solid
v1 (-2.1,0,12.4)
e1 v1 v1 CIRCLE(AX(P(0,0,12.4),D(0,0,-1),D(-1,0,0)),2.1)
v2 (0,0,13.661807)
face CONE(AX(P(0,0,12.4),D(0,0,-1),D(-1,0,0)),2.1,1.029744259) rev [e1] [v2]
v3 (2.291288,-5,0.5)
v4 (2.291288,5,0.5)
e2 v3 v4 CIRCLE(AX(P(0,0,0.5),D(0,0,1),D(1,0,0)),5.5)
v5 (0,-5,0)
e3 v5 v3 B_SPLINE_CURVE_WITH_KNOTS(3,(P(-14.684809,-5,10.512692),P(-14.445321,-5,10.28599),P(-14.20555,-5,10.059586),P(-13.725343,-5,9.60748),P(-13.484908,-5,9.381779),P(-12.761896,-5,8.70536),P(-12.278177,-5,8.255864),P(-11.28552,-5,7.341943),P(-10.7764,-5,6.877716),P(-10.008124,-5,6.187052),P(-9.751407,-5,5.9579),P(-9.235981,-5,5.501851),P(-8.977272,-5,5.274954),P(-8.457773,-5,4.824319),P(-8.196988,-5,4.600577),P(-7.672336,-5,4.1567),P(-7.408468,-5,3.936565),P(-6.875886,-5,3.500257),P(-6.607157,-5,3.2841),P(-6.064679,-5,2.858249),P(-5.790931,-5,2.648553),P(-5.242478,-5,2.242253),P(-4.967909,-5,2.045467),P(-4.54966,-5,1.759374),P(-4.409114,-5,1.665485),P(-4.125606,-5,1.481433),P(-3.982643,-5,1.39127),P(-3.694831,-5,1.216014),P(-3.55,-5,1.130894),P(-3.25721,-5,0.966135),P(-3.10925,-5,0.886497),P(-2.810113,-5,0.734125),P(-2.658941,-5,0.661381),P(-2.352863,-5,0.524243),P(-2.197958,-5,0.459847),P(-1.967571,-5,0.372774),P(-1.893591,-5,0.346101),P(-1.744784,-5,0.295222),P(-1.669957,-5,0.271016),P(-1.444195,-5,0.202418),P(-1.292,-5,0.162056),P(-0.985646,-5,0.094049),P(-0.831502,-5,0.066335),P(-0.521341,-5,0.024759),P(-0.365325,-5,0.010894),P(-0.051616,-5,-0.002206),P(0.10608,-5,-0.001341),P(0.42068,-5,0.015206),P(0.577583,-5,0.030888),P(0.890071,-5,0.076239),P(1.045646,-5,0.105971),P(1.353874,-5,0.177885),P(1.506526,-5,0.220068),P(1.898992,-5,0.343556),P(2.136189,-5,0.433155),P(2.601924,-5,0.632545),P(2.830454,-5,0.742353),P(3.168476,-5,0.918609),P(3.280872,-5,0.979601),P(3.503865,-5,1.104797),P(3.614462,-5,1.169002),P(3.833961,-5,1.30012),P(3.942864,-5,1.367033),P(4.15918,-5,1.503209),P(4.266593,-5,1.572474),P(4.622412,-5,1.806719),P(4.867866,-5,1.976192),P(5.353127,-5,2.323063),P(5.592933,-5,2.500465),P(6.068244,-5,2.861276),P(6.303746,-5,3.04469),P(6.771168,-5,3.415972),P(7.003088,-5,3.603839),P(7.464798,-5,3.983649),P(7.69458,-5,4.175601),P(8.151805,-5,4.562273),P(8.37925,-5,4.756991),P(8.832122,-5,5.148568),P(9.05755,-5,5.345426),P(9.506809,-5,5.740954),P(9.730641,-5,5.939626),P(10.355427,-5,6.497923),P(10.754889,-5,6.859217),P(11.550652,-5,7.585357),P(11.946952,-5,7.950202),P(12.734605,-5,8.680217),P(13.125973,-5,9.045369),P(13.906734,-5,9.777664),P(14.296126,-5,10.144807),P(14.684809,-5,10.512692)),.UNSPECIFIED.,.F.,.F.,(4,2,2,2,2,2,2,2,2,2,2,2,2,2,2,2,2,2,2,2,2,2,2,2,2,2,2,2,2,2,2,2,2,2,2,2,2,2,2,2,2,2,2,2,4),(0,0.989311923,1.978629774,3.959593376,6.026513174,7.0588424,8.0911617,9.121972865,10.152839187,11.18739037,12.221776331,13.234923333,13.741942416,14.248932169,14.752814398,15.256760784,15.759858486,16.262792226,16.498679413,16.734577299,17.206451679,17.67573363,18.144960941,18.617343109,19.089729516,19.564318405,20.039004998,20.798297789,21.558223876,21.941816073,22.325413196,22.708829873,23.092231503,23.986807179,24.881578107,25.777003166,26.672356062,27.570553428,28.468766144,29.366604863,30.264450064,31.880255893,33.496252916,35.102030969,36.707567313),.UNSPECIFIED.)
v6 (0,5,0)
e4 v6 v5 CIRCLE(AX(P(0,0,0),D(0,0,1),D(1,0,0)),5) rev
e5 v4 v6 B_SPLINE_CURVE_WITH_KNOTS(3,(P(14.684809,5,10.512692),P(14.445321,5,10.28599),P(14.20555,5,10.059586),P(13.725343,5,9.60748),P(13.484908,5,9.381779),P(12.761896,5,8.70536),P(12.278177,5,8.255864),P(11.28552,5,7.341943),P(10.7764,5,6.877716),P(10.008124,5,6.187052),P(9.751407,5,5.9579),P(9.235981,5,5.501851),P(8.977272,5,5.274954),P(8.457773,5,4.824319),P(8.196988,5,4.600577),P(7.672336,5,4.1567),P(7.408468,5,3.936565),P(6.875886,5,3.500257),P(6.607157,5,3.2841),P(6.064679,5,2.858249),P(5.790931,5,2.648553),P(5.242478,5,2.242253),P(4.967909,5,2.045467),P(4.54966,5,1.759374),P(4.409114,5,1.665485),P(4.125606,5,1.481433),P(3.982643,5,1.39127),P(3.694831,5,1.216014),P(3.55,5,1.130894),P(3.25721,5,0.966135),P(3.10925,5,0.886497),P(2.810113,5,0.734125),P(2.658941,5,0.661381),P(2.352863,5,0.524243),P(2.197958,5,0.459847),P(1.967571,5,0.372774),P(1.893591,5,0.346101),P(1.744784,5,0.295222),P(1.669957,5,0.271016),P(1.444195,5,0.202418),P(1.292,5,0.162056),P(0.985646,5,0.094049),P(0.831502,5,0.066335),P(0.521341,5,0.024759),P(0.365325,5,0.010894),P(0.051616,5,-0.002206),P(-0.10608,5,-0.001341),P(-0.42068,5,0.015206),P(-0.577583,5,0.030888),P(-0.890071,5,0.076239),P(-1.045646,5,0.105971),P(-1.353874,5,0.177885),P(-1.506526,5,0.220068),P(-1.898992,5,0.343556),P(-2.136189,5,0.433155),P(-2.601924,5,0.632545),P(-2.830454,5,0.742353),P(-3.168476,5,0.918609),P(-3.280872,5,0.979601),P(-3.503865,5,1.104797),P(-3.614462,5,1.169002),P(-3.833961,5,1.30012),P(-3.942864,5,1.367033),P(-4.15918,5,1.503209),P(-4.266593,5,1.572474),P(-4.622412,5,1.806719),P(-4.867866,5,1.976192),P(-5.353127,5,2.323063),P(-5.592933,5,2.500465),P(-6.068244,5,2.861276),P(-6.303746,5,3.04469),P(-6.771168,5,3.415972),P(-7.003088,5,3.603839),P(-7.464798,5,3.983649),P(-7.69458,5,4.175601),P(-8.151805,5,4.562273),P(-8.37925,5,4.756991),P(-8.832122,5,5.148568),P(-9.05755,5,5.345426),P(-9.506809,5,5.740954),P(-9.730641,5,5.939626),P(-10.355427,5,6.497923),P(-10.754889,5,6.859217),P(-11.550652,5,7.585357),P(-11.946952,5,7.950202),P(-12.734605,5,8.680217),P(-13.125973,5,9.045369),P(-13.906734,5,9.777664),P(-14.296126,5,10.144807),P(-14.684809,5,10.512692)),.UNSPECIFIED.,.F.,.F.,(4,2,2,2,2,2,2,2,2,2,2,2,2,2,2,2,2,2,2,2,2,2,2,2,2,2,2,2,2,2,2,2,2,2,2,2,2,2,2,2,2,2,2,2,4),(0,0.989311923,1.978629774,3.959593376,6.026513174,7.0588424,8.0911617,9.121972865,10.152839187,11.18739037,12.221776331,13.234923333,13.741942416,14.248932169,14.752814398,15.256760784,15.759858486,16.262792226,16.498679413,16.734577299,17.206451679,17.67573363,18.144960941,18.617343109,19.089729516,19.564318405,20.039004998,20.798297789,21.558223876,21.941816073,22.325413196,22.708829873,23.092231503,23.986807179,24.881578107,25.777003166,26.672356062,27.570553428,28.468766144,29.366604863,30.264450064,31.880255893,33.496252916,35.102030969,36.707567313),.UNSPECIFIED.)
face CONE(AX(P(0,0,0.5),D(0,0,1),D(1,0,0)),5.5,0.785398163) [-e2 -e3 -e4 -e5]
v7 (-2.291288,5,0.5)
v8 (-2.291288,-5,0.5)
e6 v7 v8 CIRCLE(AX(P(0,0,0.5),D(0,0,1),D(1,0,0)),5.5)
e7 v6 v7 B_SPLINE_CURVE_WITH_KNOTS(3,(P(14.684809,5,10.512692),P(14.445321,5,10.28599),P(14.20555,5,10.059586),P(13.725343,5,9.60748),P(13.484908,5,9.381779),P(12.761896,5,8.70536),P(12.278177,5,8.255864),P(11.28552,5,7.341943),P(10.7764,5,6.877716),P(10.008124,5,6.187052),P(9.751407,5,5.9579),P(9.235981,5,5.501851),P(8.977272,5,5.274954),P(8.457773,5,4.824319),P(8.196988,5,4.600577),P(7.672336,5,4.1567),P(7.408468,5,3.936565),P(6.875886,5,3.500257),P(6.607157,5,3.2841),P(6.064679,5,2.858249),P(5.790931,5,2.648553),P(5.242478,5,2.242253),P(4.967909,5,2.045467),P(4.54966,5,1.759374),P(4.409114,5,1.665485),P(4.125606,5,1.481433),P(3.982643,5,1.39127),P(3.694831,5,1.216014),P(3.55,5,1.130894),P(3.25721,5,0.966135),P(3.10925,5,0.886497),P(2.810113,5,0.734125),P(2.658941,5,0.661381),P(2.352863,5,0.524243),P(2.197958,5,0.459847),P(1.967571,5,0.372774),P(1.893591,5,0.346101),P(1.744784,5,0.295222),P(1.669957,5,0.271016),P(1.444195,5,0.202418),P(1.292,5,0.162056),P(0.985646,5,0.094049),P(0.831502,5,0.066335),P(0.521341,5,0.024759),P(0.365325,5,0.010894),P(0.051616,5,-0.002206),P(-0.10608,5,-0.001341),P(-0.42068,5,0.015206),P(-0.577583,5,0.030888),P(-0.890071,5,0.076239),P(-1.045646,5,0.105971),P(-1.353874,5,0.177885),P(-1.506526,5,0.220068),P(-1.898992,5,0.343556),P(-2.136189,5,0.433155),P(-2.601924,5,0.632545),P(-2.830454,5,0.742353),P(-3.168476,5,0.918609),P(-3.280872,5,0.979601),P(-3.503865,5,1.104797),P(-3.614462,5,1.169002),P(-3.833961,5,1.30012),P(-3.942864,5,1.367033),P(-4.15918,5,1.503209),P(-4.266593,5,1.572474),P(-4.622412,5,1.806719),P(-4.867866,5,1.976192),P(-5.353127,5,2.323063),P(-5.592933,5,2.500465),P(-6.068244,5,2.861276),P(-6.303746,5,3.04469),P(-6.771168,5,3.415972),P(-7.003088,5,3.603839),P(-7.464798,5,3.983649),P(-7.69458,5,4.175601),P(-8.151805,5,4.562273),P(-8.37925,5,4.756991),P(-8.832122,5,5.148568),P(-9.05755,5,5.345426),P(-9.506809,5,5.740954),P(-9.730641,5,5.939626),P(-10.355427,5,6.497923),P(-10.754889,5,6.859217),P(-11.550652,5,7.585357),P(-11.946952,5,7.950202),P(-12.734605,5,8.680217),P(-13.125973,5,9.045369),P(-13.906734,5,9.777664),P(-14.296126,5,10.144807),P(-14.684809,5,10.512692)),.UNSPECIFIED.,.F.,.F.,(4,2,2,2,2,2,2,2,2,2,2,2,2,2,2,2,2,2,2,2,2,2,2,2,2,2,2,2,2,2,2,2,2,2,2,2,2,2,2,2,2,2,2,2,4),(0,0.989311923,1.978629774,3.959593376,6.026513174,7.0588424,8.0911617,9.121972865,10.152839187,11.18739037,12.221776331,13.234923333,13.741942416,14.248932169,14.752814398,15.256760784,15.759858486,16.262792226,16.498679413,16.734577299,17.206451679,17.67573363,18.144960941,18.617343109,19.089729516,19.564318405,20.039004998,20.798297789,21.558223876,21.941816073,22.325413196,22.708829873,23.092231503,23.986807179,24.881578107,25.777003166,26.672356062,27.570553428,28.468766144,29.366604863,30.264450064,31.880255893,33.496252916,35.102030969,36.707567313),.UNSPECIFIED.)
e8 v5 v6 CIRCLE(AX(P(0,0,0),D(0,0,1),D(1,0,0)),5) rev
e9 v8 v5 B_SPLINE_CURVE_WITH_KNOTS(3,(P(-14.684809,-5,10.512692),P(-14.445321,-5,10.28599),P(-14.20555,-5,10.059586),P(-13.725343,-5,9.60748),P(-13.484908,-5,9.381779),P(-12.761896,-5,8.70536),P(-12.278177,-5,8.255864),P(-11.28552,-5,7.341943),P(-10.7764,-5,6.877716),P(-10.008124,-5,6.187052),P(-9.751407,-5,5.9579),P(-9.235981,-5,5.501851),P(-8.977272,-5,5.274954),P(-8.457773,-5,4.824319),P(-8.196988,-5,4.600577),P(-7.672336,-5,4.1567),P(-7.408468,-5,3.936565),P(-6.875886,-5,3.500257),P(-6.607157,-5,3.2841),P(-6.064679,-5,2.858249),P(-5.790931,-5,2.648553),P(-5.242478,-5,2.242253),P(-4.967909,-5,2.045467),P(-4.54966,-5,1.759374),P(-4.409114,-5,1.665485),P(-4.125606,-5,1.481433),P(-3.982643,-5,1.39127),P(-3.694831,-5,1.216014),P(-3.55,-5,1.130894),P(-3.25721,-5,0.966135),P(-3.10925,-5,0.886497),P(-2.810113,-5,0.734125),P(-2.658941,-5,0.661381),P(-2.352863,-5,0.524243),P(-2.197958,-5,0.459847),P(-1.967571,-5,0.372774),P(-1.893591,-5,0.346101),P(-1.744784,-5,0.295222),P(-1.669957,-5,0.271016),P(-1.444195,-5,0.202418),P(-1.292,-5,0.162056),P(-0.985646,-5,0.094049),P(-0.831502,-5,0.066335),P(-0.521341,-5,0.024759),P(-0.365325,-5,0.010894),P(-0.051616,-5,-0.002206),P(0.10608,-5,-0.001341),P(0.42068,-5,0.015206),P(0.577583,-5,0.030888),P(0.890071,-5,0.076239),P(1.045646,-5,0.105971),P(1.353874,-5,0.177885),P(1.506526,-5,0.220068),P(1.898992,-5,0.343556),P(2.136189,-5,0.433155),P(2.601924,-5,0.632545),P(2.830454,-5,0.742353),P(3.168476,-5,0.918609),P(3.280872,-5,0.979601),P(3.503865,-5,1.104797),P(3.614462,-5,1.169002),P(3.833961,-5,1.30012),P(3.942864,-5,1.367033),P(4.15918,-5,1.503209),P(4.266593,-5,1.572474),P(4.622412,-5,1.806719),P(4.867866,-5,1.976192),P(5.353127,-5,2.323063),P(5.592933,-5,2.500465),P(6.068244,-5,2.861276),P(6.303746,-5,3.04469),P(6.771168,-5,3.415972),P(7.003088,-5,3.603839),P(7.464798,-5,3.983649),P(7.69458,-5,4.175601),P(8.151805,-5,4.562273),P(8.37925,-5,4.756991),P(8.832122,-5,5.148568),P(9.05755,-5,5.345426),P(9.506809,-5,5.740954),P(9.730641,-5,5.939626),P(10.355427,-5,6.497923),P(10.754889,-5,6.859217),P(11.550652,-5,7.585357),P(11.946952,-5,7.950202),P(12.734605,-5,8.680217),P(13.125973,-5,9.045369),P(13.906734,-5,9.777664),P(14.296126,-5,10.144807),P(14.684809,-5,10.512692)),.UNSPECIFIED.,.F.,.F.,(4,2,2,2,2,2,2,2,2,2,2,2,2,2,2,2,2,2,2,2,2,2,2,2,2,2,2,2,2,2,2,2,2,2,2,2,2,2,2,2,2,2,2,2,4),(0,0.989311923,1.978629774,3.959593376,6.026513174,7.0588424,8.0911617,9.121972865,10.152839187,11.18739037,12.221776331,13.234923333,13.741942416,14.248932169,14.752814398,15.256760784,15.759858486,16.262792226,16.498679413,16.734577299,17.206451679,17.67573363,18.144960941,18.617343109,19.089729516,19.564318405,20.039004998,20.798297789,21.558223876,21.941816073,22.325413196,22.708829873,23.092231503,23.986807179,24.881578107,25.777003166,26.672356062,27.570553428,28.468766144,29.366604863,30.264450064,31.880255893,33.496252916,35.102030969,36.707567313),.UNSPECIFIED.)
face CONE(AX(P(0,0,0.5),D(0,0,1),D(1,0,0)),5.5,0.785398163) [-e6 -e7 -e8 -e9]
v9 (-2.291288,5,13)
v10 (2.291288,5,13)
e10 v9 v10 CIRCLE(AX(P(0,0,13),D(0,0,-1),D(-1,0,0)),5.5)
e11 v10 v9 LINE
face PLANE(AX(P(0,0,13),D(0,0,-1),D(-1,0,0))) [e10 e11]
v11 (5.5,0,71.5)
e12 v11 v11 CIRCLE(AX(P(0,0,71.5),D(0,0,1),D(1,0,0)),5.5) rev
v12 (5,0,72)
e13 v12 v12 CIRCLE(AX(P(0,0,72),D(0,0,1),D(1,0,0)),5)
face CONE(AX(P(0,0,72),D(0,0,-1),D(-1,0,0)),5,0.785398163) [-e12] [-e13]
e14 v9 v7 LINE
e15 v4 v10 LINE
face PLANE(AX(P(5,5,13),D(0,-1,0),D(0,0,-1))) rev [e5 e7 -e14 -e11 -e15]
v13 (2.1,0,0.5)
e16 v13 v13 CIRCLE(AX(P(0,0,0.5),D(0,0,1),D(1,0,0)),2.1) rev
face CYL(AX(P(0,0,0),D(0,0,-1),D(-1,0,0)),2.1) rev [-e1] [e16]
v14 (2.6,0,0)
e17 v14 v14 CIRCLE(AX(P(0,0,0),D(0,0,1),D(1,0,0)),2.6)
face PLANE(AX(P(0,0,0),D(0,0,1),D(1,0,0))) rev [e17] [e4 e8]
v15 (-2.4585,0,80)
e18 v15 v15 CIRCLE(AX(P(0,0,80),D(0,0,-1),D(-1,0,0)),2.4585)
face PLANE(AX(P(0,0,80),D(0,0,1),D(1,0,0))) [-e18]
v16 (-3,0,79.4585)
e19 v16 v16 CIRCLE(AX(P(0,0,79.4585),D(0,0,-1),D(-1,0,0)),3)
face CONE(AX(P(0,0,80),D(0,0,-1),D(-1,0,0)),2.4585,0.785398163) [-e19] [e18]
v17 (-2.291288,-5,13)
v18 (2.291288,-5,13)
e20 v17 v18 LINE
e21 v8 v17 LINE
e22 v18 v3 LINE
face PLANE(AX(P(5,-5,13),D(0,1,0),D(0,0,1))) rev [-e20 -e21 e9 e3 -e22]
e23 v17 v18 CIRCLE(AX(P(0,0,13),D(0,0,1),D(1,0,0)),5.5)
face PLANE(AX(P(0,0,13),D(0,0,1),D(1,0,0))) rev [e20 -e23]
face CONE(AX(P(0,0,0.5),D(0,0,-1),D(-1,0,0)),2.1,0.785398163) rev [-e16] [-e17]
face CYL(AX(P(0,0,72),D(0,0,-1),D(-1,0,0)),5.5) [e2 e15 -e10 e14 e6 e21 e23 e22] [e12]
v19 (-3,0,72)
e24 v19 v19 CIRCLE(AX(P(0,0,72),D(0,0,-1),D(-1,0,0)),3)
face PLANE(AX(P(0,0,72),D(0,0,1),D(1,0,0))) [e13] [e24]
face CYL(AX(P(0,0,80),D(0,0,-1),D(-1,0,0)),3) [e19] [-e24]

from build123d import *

# Parameters (mm, degrees)
SKETCH_1_R             = 5.5
EXTRUDE_1_DEPTH        = 72
CHAMFER_1_SIZE         = 0.5
SKETCH_2_R             = 3.3
EXTRUDE_2_DEPTH        = 8
HOLE_WIZARD_M5_1_D     = 4.2
HOLE_WIZARD_M5_1_DEPTH = 12.4
HOLE_WIZARD_M5_1_TIP   = 1.2618073
CHAMFER_3_SIZE         = 0.5
SKETCH_6_W             = 10
SKETCH_6_H             = 3
CUT_EXTRUDE_1_DEPTH    = 13


# Read off the part's stored shape, not the designer's step: M6 机械螺纹 螺柱1
with BuildPart() as part:
    # 草图1 → 拉伸1 (new body)
    with BuildSketch(Plane.XY):
        Circle(SKETCH_1_R)
    extrude(amount=EXTRUDE_1_DEPTH)

    # 倒角1
    chamfer_1_edges = [part.edges().sort_by_distance(p)[0] for p in [
        (-5.5, 0, 0),
        (-5.5, 0, 72),
    ]]
    chamfer(chamfer_1_edges, length=CHAMFER_1_SIZE)

    # 草图2 → 拉伸2 (add)
    with BuildSketch(Plane.XY.offset(72)):
        Circle(SKETCH_2_R)
    extrude(amount=EXTRUDE_2_DEPTH)

    # M5 螺纹孔1
    with Locations(Plane(origin=(0, 0, 0), x_dir=(-1, 0, 0), z_dir=(0, 0, -1))):
        with Locations((0, 0)):
            Hole(HOLE_WIZARD_M5_1_D / 2, depth=HOLE_WIZARD_M5_1_DEPTH)
            with Locations((0, 0, -(HOLE_WIZARD_M5_1_DEPTH + HOLE_WIZARD_M5_1_TIP / 2))):  # 118° drill point
                Cone(0, HOLE_WIZARD_M5_1_D / 2, HOLE_WIZARD_M5_1_TIP, mode=Mode.SUBTRACT)

    # 倒角3
    chamfer_3_edges = [part.edges().sort_by_distance(p)[0] for p in [
        (-2.1, 0, 0),
    ]]
    chamfer(chamfer_3_edges, length=CHAMFER_3_SIZE)

    # 草图6 → 切除-拉伸1 (cut)
    with BuildSketch(Plane(origin=(0, 0, 0), x_dir=(-1, 0, 0), z_dir=(0, 0, -1))):
        with Locations((0, 6.5)):
            Rectangle(SKETCH_6_W, SKETCH_6_H)
        with Locations((0, -6.5)):
            Rectangle(SKETCH_6_W, SKETCH_6_H)
    extrude(amount=-CUT_EXTRUDE_1_DEPTH, mode=Mode.SUBTRACT)

    # M6 机械螺纹 螺柱1 outline → M6 机械螺纹 螺柱1 (revolve, cut)
    with BuildSketch(Plane.XZ):
        Polygon((3.3, 80), (2.4585, 80), (3, 79.4585), (3, 72), (3.3, 72), align=None)
    revolve(axis=Axis((0, 0, 0), (0, 0, 1)), mode=Mode.SUBTRACT)


solid = part.part
